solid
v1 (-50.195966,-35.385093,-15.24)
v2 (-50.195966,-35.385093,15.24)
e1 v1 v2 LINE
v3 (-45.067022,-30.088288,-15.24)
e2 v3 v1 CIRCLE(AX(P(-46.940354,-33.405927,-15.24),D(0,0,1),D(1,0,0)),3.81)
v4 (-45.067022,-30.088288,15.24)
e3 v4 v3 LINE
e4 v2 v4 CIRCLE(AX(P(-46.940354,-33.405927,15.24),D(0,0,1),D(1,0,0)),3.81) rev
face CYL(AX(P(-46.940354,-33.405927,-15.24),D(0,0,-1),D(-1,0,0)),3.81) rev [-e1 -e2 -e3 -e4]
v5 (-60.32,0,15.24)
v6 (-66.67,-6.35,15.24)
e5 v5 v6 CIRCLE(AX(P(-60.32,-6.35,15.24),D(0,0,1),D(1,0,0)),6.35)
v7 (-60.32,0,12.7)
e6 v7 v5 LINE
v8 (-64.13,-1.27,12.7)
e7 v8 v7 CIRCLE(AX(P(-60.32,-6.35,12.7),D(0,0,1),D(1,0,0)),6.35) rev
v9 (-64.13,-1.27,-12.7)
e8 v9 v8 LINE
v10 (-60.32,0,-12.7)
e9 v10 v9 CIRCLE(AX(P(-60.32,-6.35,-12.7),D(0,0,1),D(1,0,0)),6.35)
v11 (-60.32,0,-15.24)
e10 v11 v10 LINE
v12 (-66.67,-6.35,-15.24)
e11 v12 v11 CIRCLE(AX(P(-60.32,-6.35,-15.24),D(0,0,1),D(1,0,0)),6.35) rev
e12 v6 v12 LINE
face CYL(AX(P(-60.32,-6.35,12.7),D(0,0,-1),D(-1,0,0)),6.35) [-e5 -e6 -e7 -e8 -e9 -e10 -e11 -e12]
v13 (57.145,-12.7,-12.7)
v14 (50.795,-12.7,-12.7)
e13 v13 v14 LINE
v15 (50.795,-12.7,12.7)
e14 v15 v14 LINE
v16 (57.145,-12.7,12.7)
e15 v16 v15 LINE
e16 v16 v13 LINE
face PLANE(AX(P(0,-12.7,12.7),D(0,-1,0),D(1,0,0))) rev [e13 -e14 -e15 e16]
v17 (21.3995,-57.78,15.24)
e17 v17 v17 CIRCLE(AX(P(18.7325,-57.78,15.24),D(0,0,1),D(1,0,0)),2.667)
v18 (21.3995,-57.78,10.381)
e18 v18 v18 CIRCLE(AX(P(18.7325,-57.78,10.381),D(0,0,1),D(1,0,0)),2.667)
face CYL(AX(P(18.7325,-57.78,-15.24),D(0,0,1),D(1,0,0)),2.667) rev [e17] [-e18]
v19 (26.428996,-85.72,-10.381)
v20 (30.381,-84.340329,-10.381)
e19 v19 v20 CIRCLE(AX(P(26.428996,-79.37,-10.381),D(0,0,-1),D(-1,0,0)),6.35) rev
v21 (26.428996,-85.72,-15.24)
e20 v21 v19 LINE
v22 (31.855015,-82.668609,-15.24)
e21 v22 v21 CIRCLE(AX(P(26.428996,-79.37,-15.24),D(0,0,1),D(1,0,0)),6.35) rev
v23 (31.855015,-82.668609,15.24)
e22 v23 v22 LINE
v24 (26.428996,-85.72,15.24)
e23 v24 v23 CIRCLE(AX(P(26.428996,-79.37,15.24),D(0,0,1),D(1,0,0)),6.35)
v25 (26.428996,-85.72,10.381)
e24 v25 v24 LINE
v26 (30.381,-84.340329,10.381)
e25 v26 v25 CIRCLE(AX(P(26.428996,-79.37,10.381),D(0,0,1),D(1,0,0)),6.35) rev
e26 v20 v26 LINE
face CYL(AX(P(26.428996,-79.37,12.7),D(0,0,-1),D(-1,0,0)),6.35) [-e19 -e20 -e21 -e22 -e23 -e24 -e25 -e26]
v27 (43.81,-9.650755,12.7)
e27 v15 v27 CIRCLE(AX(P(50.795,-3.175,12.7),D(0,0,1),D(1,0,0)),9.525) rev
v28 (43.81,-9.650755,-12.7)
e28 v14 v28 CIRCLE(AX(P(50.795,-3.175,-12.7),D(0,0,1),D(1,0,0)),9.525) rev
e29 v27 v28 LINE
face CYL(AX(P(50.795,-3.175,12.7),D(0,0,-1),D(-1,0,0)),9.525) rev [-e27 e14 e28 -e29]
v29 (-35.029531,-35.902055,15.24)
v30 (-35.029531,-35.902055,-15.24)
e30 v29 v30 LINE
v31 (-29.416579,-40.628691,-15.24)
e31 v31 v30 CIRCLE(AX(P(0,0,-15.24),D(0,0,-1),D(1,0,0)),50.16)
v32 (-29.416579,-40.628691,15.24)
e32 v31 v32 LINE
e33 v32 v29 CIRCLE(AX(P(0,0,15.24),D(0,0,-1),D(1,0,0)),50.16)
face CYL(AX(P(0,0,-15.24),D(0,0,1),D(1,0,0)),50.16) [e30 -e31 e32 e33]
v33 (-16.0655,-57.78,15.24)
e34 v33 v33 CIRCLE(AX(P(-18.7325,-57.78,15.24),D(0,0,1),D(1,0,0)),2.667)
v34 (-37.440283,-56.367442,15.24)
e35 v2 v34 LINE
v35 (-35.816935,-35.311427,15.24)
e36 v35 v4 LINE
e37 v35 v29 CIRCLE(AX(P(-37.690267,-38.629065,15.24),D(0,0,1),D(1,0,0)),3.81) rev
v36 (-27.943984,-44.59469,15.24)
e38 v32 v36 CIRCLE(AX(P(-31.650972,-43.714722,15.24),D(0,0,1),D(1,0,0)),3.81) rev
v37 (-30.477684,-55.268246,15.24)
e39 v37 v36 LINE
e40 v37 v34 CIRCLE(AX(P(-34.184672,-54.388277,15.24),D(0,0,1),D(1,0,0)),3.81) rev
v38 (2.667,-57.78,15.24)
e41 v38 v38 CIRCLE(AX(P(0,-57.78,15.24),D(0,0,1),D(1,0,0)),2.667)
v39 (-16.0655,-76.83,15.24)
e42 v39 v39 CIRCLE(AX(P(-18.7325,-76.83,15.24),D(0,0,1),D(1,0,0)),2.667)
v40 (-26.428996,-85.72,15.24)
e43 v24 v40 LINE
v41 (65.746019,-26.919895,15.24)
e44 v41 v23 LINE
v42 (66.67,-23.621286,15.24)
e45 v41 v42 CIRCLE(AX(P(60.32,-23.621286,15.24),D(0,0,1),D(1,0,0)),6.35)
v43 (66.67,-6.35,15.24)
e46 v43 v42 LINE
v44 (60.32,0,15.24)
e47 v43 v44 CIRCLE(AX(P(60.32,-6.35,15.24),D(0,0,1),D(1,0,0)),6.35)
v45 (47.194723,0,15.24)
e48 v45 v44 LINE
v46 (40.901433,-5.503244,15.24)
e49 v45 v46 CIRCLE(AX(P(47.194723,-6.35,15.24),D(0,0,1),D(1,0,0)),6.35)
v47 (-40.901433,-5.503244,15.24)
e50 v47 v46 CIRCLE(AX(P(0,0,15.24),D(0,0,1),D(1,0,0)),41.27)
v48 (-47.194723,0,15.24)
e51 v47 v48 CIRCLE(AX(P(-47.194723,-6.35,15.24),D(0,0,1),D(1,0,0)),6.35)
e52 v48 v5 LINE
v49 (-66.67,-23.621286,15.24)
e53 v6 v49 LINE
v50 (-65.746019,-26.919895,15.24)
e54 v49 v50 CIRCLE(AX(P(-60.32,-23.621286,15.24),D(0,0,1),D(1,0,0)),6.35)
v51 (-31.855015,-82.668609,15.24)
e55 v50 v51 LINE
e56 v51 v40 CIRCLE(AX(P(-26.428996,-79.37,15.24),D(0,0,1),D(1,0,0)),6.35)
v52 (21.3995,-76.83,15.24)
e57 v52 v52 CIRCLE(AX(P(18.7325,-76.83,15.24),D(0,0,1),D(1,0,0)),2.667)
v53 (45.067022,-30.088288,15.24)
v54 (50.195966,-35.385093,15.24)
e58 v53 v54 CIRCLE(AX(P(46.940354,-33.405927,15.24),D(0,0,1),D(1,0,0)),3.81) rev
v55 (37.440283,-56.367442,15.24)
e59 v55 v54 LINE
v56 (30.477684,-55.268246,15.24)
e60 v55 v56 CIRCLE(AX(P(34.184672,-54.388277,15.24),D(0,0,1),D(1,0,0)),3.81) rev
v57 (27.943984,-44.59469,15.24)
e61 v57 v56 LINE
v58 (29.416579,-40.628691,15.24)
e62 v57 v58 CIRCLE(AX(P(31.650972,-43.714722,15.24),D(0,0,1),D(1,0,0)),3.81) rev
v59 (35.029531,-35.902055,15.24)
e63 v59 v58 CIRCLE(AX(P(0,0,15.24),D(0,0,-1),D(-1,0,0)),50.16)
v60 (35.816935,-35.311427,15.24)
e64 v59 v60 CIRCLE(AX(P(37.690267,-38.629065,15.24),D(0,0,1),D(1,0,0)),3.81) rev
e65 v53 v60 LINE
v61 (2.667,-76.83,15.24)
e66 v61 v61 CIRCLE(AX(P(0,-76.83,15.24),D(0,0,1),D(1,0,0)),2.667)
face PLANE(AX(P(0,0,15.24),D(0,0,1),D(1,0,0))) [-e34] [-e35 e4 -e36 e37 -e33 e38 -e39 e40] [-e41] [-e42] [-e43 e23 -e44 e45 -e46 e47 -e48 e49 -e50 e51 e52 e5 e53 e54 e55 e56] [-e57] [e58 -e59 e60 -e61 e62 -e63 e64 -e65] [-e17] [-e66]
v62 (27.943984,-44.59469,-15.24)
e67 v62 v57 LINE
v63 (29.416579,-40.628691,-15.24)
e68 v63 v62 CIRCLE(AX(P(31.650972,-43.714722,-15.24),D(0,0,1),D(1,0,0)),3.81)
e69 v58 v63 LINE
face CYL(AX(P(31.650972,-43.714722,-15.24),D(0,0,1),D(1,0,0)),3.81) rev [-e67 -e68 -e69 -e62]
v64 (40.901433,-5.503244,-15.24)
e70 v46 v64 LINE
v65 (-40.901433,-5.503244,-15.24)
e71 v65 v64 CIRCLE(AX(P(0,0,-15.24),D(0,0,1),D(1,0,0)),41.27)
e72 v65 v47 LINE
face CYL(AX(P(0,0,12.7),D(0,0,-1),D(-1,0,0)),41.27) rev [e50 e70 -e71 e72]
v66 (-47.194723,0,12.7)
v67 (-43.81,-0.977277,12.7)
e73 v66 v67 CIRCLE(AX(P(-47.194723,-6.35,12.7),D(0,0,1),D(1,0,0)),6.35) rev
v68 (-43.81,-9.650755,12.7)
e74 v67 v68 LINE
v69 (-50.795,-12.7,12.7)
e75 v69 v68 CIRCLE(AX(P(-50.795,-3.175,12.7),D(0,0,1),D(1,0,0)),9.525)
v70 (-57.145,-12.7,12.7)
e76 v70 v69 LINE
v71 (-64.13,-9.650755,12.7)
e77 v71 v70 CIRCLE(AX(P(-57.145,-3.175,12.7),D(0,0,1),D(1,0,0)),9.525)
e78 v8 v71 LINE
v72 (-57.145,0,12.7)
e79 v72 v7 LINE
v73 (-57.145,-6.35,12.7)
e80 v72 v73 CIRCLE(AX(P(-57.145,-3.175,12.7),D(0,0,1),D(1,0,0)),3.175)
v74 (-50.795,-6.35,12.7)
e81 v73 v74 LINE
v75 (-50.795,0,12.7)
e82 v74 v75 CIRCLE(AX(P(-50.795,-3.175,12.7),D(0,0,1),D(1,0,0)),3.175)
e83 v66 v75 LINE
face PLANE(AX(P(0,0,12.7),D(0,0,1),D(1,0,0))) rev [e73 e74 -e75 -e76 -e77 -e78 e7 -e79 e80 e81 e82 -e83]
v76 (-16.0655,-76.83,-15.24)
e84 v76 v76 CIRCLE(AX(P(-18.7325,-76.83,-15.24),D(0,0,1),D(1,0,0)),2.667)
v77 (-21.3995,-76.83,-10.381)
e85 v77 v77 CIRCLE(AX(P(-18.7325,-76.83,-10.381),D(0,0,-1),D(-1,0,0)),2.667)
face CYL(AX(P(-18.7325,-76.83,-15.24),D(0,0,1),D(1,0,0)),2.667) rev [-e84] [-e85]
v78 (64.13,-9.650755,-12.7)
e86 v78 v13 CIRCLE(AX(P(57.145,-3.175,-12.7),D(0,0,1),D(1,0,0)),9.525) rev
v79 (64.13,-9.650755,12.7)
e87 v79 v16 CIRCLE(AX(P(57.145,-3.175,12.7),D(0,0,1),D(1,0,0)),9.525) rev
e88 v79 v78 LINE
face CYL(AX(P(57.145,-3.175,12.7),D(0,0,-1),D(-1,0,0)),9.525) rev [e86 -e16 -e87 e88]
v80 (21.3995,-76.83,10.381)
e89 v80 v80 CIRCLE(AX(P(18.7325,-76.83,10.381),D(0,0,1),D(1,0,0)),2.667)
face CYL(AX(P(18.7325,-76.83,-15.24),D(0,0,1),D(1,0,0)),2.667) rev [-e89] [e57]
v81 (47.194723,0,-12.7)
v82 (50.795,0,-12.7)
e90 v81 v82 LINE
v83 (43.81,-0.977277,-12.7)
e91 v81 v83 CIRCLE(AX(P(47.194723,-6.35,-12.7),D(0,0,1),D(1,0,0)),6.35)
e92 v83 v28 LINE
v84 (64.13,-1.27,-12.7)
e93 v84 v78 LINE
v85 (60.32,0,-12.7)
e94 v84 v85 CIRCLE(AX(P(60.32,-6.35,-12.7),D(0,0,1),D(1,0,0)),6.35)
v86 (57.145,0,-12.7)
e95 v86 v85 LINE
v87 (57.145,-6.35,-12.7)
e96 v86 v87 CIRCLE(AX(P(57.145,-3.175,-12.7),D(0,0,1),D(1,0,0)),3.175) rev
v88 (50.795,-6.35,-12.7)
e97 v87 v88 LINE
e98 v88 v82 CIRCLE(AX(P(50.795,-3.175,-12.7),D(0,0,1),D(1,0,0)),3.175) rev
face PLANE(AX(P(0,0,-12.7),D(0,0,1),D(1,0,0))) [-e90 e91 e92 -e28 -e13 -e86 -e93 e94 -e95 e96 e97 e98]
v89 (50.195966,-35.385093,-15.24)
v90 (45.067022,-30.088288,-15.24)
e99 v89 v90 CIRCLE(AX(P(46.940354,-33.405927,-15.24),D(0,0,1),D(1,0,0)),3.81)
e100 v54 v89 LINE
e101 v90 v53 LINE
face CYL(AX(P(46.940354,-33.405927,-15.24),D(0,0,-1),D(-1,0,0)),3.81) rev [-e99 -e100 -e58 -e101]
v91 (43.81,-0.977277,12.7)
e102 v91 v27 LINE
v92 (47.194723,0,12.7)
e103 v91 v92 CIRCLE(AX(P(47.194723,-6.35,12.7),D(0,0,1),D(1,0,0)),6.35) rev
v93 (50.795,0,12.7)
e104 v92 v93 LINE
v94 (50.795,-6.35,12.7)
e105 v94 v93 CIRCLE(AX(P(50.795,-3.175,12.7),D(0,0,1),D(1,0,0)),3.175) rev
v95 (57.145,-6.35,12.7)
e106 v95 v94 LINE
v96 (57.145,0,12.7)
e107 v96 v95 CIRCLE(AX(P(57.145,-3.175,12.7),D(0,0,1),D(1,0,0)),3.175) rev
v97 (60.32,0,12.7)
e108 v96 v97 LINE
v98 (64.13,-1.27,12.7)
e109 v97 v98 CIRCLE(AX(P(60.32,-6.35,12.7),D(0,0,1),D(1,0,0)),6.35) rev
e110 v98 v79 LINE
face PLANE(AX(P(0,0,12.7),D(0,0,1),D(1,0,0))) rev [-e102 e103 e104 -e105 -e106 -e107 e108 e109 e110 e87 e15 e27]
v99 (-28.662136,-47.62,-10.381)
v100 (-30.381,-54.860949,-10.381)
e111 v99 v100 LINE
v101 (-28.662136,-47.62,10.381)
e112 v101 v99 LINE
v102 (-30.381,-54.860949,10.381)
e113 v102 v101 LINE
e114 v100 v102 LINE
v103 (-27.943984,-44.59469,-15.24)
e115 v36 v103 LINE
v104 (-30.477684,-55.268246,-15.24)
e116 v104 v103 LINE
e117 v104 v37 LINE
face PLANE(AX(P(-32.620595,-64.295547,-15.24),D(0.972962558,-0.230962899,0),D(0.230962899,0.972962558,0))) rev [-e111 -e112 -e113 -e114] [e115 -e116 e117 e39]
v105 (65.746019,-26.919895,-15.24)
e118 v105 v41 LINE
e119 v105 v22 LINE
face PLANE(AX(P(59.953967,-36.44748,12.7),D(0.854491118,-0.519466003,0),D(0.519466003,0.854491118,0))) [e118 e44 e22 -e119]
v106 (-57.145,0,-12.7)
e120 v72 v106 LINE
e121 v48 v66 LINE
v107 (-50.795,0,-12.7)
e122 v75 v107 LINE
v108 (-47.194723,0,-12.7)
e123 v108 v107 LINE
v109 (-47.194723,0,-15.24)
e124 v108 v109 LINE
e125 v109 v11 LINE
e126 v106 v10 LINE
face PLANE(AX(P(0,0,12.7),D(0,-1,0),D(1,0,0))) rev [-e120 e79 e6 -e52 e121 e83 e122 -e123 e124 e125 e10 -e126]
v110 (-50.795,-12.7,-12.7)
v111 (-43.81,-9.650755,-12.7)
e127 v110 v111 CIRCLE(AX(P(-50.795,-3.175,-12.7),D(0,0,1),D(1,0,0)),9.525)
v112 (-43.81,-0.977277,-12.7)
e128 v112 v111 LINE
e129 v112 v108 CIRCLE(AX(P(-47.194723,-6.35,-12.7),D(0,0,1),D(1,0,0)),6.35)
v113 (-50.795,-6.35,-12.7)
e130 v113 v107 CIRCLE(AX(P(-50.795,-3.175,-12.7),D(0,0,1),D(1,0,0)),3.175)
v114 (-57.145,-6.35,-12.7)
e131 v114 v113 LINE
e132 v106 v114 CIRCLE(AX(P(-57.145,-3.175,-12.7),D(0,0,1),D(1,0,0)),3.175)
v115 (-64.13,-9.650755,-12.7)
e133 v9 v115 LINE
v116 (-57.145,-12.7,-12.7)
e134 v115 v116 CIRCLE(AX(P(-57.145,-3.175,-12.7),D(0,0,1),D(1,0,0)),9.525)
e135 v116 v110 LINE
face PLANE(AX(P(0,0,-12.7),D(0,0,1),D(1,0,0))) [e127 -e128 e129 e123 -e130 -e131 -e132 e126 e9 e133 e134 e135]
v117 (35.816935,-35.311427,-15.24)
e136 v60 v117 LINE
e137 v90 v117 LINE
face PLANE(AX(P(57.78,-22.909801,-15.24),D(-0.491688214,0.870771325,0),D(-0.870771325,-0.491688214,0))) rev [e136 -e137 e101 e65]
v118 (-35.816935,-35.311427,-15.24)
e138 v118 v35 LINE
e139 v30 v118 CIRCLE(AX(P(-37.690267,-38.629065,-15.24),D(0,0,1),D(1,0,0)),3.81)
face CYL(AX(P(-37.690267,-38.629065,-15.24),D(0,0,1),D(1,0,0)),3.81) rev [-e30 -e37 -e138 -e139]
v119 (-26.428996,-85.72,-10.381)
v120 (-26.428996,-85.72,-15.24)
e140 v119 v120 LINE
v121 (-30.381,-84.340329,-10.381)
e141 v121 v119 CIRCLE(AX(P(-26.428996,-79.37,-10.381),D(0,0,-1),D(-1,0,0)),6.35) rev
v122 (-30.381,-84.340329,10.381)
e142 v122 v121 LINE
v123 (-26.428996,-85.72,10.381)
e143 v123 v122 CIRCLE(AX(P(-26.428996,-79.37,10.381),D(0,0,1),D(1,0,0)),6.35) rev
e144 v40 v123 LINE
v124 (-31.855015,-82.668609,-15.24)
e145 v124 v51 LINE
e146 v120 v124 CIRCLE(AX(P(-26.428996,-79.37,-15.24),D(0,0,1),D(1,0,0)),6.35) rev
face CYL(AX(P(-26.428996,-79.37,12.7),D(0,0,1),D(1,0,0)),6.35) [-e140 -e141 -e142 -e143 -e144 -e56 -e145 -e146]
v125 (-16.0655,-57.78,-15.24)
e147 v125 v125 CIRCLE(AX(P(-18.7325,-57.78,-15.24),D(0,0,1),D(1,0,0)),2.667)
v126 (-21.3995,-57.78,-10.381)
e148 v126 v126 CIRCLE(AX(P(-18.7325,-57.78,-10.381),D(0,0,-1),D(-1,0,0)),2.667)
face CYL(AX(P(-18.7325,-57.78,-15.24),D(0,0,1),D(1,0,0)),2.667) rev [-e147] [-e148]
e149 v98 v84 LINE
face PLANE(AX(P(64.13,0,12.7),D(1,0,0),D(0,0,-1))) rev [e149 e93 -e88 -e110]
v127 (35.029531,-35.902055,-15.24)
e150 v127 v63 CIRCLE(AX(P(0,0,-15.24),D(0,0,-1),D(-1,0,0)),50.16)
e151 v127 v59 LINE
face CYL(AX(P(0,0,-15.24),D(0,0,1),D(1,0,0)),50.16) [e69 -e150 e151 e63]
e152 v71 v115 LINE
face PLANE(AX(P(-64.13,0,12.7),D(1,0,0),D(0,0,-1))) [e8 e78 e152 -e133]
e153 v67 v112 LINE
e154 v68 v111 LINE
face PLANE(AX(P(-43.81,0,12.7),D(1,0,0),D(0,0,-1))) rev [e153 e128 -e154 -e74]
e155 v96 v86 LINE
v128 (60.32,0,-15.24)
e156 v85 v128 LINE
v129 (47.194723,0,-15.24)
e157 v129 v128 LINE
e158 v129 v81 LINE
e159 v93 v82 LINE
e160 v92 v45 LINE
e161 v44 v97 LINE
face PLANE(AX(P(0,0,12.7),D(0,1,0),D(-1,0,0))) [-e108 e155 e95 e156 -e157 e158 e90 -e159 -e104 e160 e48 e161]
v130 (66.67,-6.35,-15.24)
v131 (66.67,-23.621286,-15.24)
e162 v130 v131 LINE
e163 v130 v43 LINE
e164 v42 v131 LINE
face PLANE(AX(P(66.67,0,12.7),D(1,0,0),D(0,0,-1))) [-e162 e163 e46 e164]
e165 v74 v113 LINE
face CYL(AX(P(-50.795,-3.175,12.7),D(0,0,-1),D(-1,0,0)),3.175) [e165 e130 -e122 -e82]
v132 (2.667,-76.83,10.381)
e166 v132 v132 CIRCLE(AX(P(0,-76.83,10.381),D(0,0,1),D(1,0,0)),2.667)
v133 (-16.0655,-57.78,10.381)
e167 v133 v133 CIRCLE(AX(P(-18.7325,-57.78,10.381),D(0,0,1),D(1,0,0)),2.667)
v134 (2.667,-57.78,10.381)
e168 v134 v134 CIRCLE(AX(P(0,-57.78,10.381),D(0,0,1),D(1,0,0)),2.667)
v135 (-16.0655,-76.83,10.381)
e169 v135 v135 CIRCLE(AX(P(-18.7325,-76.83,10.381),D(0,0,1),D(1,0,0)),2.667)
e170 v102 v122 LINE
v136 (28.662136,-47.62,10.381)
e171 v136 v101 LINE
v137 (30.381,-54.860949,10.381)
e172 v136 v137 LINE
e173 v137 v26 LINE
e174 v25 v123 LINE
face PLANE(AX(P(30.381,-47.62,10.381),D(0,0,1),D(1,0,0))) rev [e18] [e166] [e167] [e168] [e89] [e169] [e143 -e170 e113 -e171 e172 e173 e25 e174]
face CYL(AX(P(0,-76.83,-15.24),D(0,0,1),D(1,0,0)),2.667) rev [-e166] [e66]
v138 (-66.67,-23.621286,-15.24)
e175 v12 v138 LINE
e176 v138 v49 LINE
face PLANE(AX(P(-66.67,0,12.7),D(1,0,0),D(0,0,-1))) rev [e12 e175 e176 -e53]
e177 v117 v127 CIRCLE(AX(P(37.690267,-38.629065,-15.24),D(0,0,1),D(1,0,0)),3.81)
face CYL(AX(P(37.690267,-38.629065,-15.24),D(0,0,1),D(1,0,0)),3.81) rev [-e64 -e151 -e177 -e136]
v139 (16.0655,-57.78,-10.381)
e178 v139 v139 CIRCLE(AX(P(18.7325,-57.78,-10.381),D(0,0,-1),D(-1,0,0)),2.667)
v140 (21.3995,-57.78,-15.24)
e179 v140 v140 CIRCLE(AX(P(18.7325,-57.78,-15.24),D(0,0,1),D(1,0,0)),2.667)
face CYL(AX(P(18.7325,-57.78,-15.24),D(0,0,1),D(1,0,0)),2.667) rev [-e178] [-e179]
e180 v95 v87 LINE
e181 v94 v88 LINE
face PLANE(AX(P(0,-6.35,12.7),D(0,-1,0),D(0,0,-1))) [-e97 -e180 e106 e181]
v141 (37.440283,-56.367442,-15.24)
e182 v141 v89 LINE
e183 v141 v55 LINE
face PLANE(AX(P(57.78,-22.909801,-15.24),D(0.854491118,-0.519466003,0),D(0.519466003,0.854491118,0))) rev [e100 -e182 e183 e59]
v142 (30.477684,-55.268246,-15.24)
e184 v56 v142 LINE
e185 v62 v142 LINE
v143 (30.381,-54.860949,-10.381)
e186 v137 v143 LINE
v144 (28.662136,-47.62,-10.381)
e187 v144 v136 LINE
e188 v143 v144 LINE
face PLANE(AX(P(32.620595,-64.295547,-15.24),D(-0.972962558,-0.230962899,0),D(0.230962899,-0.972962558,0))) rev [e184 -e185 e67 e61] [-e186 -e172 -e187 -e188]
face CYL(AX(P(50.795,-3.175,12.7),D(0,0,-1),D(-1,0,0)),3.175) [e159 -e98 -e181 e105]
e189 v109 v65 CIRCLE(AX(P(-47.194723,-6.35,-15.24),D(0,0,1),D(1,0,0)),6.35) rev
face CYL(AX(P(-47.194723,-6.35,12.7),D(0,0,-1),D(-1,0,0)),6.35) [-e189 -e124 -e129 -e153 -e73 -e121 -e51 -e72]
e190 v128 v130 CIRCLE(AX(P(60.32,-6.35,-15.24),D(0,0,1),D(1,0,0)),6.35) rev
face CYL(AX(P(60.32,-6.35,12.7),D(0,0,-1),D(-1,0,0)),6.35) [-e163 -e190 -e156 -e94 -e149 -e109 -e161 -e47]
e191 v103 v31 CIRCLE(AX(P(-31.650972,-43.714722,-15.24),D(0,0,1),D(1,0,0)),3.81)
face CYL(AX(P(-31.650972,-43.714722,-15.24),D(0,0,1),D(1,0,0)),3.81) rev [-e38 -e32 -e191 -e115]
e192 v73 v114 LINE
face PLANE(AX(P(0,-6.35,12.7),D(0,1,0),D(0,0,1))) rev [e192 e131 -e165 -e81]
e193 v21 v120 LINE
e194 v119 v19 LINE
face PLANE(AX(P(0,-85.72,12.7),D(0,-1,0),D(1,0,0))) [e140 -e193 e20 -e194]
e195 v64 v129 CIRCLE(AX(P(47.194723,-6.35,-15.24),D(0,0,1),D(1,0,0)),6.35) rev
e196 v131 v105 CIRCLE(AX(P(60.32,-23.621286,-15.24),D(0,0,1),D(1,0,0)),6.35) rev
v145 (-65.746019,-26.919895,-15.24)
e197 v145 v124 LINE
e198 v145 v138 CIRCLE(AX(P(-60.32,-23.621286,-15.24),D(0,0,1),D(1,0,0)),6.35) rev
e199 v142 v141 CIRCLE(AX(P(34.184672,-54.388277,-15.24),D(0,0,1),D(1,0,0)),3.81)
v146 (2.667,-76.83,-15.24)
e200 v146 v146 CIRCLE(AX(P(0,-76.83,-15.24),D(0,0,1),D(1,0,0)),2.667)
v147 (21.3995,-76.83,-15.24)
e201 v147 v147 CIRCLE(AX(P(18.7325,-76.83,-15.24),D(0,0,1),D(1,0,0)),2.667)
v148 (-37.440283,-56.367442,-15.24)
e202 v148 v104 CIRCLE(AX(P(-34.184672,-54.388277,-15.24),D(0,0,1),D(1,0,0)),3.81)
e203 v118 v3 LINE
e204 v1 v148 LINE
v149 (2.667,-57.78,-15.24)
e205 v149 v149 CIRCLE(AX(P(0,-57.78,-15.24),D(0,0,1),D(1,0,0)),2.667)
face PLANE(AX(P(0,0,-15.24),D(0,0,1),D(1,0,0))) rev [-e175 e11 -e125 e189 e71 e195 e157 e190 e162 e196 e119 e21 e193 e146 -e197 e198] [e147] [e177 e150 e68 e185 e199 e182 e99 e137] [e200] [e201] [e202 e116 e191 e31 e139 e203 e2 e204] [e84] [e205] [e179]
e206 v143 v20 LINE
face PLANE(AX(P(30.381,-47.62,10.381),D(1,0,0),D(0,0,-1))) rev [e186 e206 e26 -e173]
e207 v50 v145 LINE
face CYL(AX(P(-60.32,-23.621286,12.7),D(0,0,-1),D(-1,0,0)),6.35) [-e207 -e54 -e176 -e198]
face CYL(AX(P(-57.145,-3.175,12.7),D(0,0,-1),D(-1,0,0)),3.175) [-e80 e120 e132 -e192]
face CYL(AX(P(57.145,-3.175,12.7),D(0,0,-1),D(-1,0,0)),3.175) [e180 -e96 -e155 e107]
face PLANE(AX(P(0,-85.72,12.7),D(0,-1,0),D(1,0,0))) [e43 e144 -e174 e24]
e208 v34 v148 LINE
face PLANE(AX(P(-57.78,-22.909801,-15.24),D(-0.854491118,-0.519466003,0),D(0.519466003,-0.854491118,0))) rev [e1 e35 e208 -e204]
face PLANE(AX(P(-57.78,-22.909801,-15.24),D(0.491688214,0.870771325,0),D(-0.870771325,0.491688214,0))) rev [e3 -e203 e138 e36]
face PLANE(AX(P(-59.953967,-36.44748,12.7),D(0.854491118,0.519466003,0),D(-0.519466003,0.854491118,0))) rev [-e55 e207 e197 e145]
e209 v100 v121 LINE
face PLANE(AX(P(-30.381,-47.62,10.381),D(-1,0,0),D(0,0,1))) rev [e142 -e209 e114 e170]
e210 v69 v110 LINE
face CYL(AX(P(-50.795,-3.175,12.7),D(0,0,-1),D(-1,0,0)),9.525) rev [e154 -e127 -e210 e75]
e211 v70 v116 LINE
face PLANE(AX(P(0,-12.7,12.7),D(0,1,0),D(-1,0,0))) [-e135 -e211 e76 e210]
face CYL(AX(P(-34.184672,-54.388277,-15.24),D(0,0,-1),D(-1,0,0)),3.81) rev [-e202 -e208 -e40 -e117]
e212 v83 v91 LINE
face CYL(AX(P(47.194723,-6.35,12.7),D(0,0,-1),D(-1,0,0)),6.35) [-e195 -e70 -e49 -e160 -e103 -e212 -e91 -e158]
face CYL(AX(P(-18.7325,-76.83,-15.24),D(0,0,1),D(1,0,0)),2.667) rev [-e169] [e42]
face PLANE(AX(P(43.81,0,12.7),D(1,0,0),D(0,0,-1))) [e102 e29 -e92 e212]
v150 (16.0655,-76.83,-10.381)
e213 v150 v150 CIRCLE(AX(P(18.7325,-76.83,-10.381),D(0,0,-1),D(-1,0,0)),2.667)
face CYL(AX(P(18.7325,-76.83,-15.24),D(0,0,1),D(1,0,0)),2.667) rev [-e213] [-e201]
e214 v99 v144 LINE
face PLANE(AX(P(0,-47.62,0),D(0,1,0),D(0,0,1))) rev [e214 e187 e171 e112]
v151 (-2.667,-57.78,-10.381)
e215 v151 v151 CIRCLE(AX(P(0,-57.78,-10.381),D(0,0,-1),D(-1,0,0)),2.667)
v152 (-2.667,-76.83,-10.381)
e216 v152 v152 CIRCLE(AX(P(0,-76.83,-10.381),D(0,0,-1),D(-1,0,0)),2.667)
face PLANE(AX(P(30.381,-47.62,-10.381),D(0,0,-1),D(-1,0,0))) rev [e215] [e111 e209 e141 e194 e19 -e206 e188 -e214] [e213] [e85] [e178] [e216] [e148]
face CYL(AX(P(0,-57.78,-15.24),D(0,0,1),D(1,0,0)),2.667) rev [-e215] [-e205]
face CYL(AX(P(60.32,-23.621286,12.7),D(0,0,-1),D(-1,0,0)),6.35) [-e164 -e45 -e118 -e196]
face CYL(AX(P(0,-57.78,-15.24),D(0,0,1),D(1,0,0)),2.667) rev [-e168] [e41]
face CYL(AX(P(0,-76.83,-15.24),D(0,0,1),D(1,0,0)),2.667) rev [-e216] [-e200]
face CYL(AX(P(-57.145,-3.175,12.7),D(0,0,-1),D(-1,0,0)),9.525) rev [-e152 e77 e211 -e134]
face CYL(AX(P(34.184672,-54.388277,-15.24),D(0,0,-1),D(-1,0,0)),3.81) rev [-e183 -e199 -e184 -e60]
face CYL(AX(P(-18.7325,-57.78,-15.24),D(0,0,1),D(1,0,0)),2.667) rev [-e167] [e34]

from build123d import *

# Parameters (mm, degrees)
BOSS_EXTRUDE1_DEPTH   = 12.7
BOSS_EXTRUDE1_2_DEPTH = 12.7
BOSS_EXTRUDE1_3_DEPTH = 12.7
BOSS_EXTRUDE3_START   = 15.24
BOSS_EXTRUDE3_DEPTH   = 2.54
BOSS_EXTRUDE4_START   = -12.7
BOSS_EXTRUDE4_DEPTH   = 2.54
FILLET2_R             = 6.35
SKETCH2_W             = 60.761999888
SKETCH2_H             = 20.761999878
CUT_EXTRUDE1_DEPTH    = 38.1
SKETCH3_R             = 2.667
CUT_EXTRUDE2_DEPTH    = 113.791124208
CUT_EXTRUDE3_DEPTH    = 113.791124208
FILLET3_R             = 3.81


with BuildPart() as part:
    # Sketch1 → Boss-Extrude1 (new, symmetric)
    with BuildSketch(Plane.XY):
        with BuildLine():
            ThreePointArc((41.27, 0), (0, -41.27), (-41.27, 0))
            Line((-41.27, 0), (-43.81, 0))
            Line((-43.81, 0), (-43.81, -9.650754782))
            ThreePointArc((-43.81, -9.650754782), (-46.984221818, -11.904467031), (-50.795, -12.7))
            Line((-50.795, -12.7), (-57.145, -12.7))
            ThreePointArc((-57.145, -12.7), (-60.955778182, -11.904467031), (-64.13, -9.650754782))
            Line((-64.13, -9.650754782), (-64.13, 0))
            Line((-64.13, 0), (-66.67, 0))
            Line((-66.67, 0), (-66.67, -25.4))
            Line((-66.67, -25.4), (-30, -85.72))
            Line((-30, -85.72), (30, -85.72))
            Line((30, -85.72), (66.67, -25.4))
            Line((66.67, -25.4), (66.67, 0))
            Line((66.67, 0), (64.13, 0))
            Line((64.13, 0), (64.13, -9.650754782))
            ThreePointArc((64.13, -9.650754782), (60.955778182, -11.904467031), (57.145, -12.7))
            Line((57.145, -12.7), (50.795, -12.7))
            ThreePointArc((50.795, -12.7), (46.984221818, -11.904467031), (43.81, -9.650754782))
            Line((43.81, -9.650754782), (43.81, 0))
            Line((43.81, 0), (41.27, 0))
        make_face()
    extrude(amount=BOSS_EXTRUDE1_DEPTH, both=True)



with BuildPart() as body_2:
    # Sketch1 → Boss-Extrude1 2 (new, symmetric)
    with BuildSketch(Plane.XY):
        with BuildLine():
            ThreePointArc((-50.795, -6.35), (-47.62, -3.175), (-50.795, 0))
            Line((-50.795, 0), (-57.145, 0))
            ThreePointArc((-57.145, 0), (-60.32, -3.175), (-57.145, -6.35))
            Line((-57.145, -6.35), (-50.795, -6.35))
        make_face()
    extrude(amount=BOSS_EXTRUDE1_2_DEPTH, both=True)


with BuildPart() as body_3:
    # Sketch1 → Boss-Extrude1 3 (new, symmetric)
    with BuildSketch(Plane.XY):
        with BuildLine():
            Line((57.145, 0), (50.795, 0))
            ThreePointArc((50.795, 0), (47.62, -3.175), (50.795, -6.35))
            Line((50.795, -6.35), (57.145, -6.35))
            ThreePointArc((57.145, -6.35), (60.32, -3.175), (57.145, 0))
        make_face()
    extrude(amount=BOSS_EXTRUDE1_3_DEPTH, both=True)


with BuildPart() as part_1:
    add(part.part)

    add(body_2.part)  # Boss-Extrude3 merges body 2

    add(body_3.part)  # Boss-Extrude3 merges body 3
    # Sketch1<3> → Boss-Extrude3 (add)
    with BuildSketch(Plane.XY.offset(BOSS_EXTRUDE3_START)):
        with BuildLine():
            ThreePointArc((41.27, 0), (0, -41.27), (-41.27, 0))
            Line((-41.27, 0), (-43.81, 0))
            Line((-43.81, 0), (-43.81, -9.650754782))
            ThreePointArc((-43.81, -9.650754782), (-46.984221818, -11.904467031), (-50.795, -12.7))
            Line((-50.795, -12.7), (-57.145, -12.7))
            ThreePointArc((-57.145, -12.7), (-60.955778182, -11.904467031), (-64.13, -9.650754782))
            Line((-64.13, -9.650754782), (-64.13, 0))
            Line((-64.13, 0), (-66.67, 0))
            Line((-66.67, 0), (-66.67, -25.4))
            Line((-66.67, -25.4), (-30, -85.72))
            Line((-30, -85.72), (30, -85.72))
            Line((30, -85.72), (66.67, -25.4))
            Line((66.67, -25.4), (66.67, 0))
            Line((66.67, 0), (64.13, 0))
            Line((64.13, 0), (64.13, -9.650754782))
            ThreePointArc((64.13, -9.650754782), (60.955778182, -11.904467031), (57.145, -12.7))
            Line((57.145, -12.7), (50.795, -12.7))
            ThreePointArc((50.795, -12.7), (46.984221818, -11.904467031), (43.81, -9.650754782))
            Line((43.81, -9.650754782), (43.81, 0))
            Line((43.81, 0), (41.27, 0))
        make_face()
        with BuildLine():
            Line((-43.81, -9.650754782), (-43.81, 0))
            Line((-43.81, 0), (-50.795, 0))
            ThreePointArc((-50.795, 0), (-47.62, -3.175), (-50.795, -6.35))
            Line((-50.795, -6.35), (-57.145, -6.35))
            ThreePointArc((-57.145, -6.35), (-60.32, -3.175), (-57.145, 0))
            Line((-57.145, 0), (-64.13, 0))
            Line((-64.13, 0), (-64.13, -9.650754782))
            ThreePointArc((-64.13, -9.650754782), (-60.955778182, -11.904467031), (-57.145, -12.7))
            Line((-57.145, -12.7), (-50.795, -12.7))
            ThreePointArc((-50.795, -12.7), (-46.984221818, -11.904467031), (-43.81, -9.650754782))
        make_face()
        with BuildLine():
            ThreePointArc((-50.795, -6.35), (-47.62, -3.175), (-50.795, 0))
            Line((-50.795, 0), (-57.145, 0))
            ThreePointArc((-57.145, 0), (-60.32, -3.175), (-57.145, -6.35))
            Line((-57.145, -6.35), (-50.795, -6.35))
        make_face()
        with BuildLine():
            Line((50.795, 0), (43.81, 0))
            Line((43.81, 0), (43.81, -9.650754782))
            ThreePointArc((43.81, -9.650754782), (46.984221818, -11.904467031), (50.795, -12.7))
            Line((50.795, -12.7), (57.145, -12.7))
            ThreePointArc((57.145, -12.7), (60.955778182, -11.904467031), (64.13, -9.650754782))
            Line((64.13, -9.650754782), (64.13, 0))
            Line((64.13, 0), (57.145, 0))
            ThreePointArc((57.145, 0), (60.32, -3.175), (57.145, -6.35))
            Line((57.145, -6.35), (50.795, -6.35))
            ThreePointArc((50.795, -6.35), (47.62, -3.175), (50.795, 0))
        make_face()
        with BuildLine():
            Line((57.145, 0), (50.795, 0))
            ThreePointArc((50.795, 0), (47.62, -3.175), (50.795, -6.35))
            Line((50.795, -6.35), (57.145, -6.35))
            ThreePointArc((57.145, -6.35), (60.32, -3.175), (57.145, 0))
        make_face()
    extrude(amount=-BOSS_EXTRUDE3_DEPTH)

    # Sketch1<4> → Boss-Extrude4 (add)
    with BuildSketch(Plane.XY.offset(BOSS_EXTRUDE4_START)):
        with BuildLine():
            ThreePointArc((-50.795, -6.35), (-47.62, -3.175), (-50.795, 0))
            Line((-50.795, 0), (-57.145, 0))
            ThreePointArc((-57.145, 0), (-60.32, -3.175), (-57.145, -6.35))
            Line((-57.145, -6.35), (-50.795, -6.35))
        make_face()
        with BuildLine():
            Line((-43.81, -9.650754782), (-43.81, 0))
            Line((-43.81, 0), (-50.795, 0))
            ThreePointArc((-50.795, 0), (-47.62, -3.175), (-50.795, -6.35))
            Line((-50.795, -6.35), (-57.145, -6.35))
            ThreePointArc((-57.145, -6.35), (-60.32, -3.175), (-57.145, 0))
            Line((-57.145, 0), (-64.13, 0))
            Line((-64.13, 0), (-64.13, -9.650754782))
            ThreePointArc((-64.13, -9.650754782), (-60.955778182, -11.904467031), (-57.145, -12.7))
            Line((-57.145, -12.7), (-50.795, -12.7))
            ThreePointArc((-50.795, -12.7), (-46.984221818, -11.904467031), (-43.81, -9.650754782))
        make_face()
        with BuildLine():
            ThreePointArc((41.27, 0), (0, -41.27), (-41.27, 0))
            Line((-41.27, 0), (-43.81, 0))
            Line((-43.81, 0), (-43.81, -9.650754782))
            ThreePointArc((-43.81, -9.650754782), (-46.984221818, -11.904467031), (-50.795, -12.7))
            Line((-50.795, -12.7), (-57.145, -12.7))
            ThreePointArc((-57.145, -12.7), (-60.955778182, -11.904467031), (-64.13, -9.650754782))
            Line((-64.13, -9.650754782), (-64.13, 0))
            Line((-64.13, 0), (-66.67, 0))
            Line((-66.67, 0), (-66.67, -25.4))
            Line((-66.67, -25.4), (-30, -85.72))
            Line((-30, -85.72), (30, -85.72))
            Line((30, -85.72), (66.67, -25.4))
            Line((66.67, -25.4), (66.67, 0))
            Line((66.67, 0), (64.13, 0))
            Line((64.13, 0), (64.13, -9.650754782))
            ThreePointArc((64.13, -9.650754782), (60.955778182, -11.904467031), (57.145, -12.7))
            Line((57.145, -12.7), (50.795, -12.7))
            ThreePointArc((50.795, -12.7), (46.984221818, -11.904467031), (43.81, -9.650754782))
            Line((43.81, -9.650754782), (43.81, 0))
            Line((43.81, 0), (41.27, 0))
        make_face()
        with BuildLine():
            Line((57.145, 0), (50.795, 0))
            ThreePointArc((50.795, 0), (47.62, -3.175), (50.795, -6.35))
            Line((50.795, -6.35), (57.145, -6.35))
            ThreePointArc((57.145, -6.35), (60.32, -3.175), (57.145, 0))
        make_face()
        with BuildLine():
            Line((50.795, 0), (43.81, 0))
            Line((43.81, 0), (43.81, -9.650754782))
            ThreePointArc((43.81, -9.650754782), (46.984221818, -11.904467031), (50.795, -12.7))
            Line((50.795, -12.7), (57.145, -12.7))
            ThreePointArc((57.145, -12.7), (60.955778182, -11.904467031), (64.13, -9.650754782))
            Line((64.13, -9.650754782), (64.13, 0))
            Line((64.13, 0), (57.145, 0))
            ThreePointArc((57.145, 0), (60.32, -3.175), (57.145, -6.35))
            Line((57.145, -6.35), (50.795, -6.35))
            ThreePointArc((50.795, -6.35), (47.62, -3.175), (50.795, 0))
        make_face()
    extrude(amount=-BOSS_EXTRUDE4_DEPTH)

    # Fillet2
    # the kernel refuses this fillet: 6.35 mm, written as the material it takes off along each edge
    with BuildSketch(Plane(origin=(-66.67, 0, -31.115), x_dir=(1, 0, 0), z_dir=(0, 0, 1))) as fillet2_piece_1:
        with BuildLine():
            CenterArc((FILLET2_R, -FILLET2_R), FILLET2_R, 90, 90)
            Line((0, -FILLET2_R), (0, 0))
            Line((0, 0), (FILLET2_R, 0))
        make_face()
    extrude(amount=62.23, mode=Mode.SUBTRACT)
    with BuildSketch(Plane(origin=(-41.27, 0, -30.051808055), x_dir=(0.06682302644144887, -0.9977648436065512, 0), z_dir=(0, 0, 1)), Plane(origin=(41.27, 0, 30.051808055), x_dir=(-0.06682302644145022, -0.9977648436065509, 0), z_dir=(0, 0, -1))) as fillet2_piece_2:
        with BuildLine():
            CenterArc((5.93989882, -6.335806757), FILLET2_R, 93.831532506, 82.336934987)
            Line((-0.395907937, -5.911480539), (0, 0))
            ThreePointArc((0, 0), (2.757786301, -0.092244904), (5.515572602, 0))
        make_face()
    extrude(amount=60.10361611, mode=Mode.SUBTRACT)
    with BuildSketch(Plane(origin=(66.67, 0, 31.115), x_dir=(0, -1, 0), z_dir=(0, 0, -1))) as fillet2_piece_3:
        with BuildLine():
            CenterArc((FILLET2_R, FILLET2_R), FILLET2_R, 180, 90)
            Line((0, FILLET2_R), (0, 0))
            Line((0, 0), (FILLET2_R, 0))
        make_face()
    extrude(amount=62.23, mode=Mode.SUBTRACT)
    with BuildSketch(Plane(origin=(66.67, -25.4, -19.686784737), x_dir=(-0.5194660032089745, -0.8544911184500947, 0), z_dir=(0, 0, 1)), Plane(origin=(-66.67, -25.4, -19.686784737), x_dir=(0, 1, 0), z_dir=(0, 0, 1))) as fillet2_piece_4:
        with BuildLine():
            CenterArc((FILLET2_R * 0.280112424395, -FILLET2_R), FILLET2_R, 90, 31.296438863)
            Line((-FILLET2_R * 0.239353578813, -FILLET2_R * 0.14550888155), (0, 0))
            Line((0, 0), (FILLET2_R * 0.280112424395, 0))
        make_face()
    extrude(amount=39.373569475, mode=Mode.SUBTRACT)
    with BuildSketch(Plane(origin=(30, -85.72, -24.167509057), x_dir=(-1, 0, 0), z_dir=(0, 0, 1)), Plane(origin=(-30, -85.72, -24.167509057), x_dir=(-0.51946600320897, 0.8544911184500974, 0), z_dir=(0, 0, 1))) as fillet2_piece_5:
        with BuildLine():
            CenterArc((FILLET2_R * 0.562362775242, -FILLET2_R), FILLET2_R, 90, 58.703561137)
            Line((-FILLET2_R * 0.292128343208, -FILLET2_R * 0.480533996791), (0, 0))
            Line((0, 0), (FILLET2_R * 0.562362775242, 0))
        make_face()
    extrude(amount=48.335018114, mode=Mode.SUBTRACT)

    # Sketch2 → Cut-Extrude1 (cut)
    with BuildSketch(Plane.XZ.offset(85.72)):
        Rectangle(SKETCH2_W, SKETCH2_H)
    extrude(amount=-CUT_EXTRUDE1_DEPTH, mode=Mode.SUBTRACT)

    # Sketch3 → Cut-Extrude2 (cut, through all)
    with BuildSketch(Plane.XY.offset(15.24)):
        with Locations((0, -57.78)):
            Circle(SKETCH3_R)
        with Locations((0, -76.83)):
            Circle(SKETCH3_R)
        with Locations((-18.7325, -57.78)):
            Circle(SKETCH3_R)
        with Locations((18.7325, -57.78)):
            Circle(SKETCH3_R)
        with Locations((-18.7325, -76.83)):
            Circle(SKETCH3_R)
        with Locations((18.7325, -76.83)):
            Circle(SKETCH3_R)
    extrude(amount=-CUT_EXTRUDE2_DEPTH, mode=Mode.SUBTRACT)

    # Sketch4 → Cut-Extrude3 (cut, through all)
    with BuildSketch(Plane.XY.offset(15.24)):
        with BuildLine():
            Line((57.78, -22.909800547), (32.620594928, -64.295546768))
            Line((32.620594928, -64.295546768), (27.340783065, -42.053622691))
            ThreePointArc((27.340783065, -42.053622691), (31.526384833, -39.014262255), (35.376715506, -35.56))
            Line((35.376715506, -35.56), (57.78, -22.909800547))
        make_face()
        with BuildLine():
            Line((-57.78, -22.909800547), (-35.376715506, -35.56))
            ThreePointArc((-35.376715506, -35.56), (-31.526384833, -39.014262255), (-27.340783065, -42.053622691))
            Line((-27.340783065, -42.053622691), (-32.620594928, -64.295546768))
            Line((-32.620594928, -64.295546768), (-57.78, -22.909800547))
        make_face()
    extrude(amount=-CUT_EXTRUDE3_DEPTH, mode=Mode.SUBTRACT)

    # Fillet3
    fillet3_edges = [part_1.edges().sort_by_distance(p)[0] for p in [
        (-27.340783065, -42.053622691, 0),
        (-35.376715506, -35.56, 0),
        (-32.620594928, -64.295546768, 0),
        (-57.78, -22.909800547, 0),
        (32.620594928, -64.295546768, 0),
        (27.340783065, -42.053622691, 0),
        (35.376715506, -35.56, 0),
        (57.78, -22.909800547, 0),
    ]]
    fillet(fillet3_edges, radius=FILLET3_R)


solid = part_1.part
